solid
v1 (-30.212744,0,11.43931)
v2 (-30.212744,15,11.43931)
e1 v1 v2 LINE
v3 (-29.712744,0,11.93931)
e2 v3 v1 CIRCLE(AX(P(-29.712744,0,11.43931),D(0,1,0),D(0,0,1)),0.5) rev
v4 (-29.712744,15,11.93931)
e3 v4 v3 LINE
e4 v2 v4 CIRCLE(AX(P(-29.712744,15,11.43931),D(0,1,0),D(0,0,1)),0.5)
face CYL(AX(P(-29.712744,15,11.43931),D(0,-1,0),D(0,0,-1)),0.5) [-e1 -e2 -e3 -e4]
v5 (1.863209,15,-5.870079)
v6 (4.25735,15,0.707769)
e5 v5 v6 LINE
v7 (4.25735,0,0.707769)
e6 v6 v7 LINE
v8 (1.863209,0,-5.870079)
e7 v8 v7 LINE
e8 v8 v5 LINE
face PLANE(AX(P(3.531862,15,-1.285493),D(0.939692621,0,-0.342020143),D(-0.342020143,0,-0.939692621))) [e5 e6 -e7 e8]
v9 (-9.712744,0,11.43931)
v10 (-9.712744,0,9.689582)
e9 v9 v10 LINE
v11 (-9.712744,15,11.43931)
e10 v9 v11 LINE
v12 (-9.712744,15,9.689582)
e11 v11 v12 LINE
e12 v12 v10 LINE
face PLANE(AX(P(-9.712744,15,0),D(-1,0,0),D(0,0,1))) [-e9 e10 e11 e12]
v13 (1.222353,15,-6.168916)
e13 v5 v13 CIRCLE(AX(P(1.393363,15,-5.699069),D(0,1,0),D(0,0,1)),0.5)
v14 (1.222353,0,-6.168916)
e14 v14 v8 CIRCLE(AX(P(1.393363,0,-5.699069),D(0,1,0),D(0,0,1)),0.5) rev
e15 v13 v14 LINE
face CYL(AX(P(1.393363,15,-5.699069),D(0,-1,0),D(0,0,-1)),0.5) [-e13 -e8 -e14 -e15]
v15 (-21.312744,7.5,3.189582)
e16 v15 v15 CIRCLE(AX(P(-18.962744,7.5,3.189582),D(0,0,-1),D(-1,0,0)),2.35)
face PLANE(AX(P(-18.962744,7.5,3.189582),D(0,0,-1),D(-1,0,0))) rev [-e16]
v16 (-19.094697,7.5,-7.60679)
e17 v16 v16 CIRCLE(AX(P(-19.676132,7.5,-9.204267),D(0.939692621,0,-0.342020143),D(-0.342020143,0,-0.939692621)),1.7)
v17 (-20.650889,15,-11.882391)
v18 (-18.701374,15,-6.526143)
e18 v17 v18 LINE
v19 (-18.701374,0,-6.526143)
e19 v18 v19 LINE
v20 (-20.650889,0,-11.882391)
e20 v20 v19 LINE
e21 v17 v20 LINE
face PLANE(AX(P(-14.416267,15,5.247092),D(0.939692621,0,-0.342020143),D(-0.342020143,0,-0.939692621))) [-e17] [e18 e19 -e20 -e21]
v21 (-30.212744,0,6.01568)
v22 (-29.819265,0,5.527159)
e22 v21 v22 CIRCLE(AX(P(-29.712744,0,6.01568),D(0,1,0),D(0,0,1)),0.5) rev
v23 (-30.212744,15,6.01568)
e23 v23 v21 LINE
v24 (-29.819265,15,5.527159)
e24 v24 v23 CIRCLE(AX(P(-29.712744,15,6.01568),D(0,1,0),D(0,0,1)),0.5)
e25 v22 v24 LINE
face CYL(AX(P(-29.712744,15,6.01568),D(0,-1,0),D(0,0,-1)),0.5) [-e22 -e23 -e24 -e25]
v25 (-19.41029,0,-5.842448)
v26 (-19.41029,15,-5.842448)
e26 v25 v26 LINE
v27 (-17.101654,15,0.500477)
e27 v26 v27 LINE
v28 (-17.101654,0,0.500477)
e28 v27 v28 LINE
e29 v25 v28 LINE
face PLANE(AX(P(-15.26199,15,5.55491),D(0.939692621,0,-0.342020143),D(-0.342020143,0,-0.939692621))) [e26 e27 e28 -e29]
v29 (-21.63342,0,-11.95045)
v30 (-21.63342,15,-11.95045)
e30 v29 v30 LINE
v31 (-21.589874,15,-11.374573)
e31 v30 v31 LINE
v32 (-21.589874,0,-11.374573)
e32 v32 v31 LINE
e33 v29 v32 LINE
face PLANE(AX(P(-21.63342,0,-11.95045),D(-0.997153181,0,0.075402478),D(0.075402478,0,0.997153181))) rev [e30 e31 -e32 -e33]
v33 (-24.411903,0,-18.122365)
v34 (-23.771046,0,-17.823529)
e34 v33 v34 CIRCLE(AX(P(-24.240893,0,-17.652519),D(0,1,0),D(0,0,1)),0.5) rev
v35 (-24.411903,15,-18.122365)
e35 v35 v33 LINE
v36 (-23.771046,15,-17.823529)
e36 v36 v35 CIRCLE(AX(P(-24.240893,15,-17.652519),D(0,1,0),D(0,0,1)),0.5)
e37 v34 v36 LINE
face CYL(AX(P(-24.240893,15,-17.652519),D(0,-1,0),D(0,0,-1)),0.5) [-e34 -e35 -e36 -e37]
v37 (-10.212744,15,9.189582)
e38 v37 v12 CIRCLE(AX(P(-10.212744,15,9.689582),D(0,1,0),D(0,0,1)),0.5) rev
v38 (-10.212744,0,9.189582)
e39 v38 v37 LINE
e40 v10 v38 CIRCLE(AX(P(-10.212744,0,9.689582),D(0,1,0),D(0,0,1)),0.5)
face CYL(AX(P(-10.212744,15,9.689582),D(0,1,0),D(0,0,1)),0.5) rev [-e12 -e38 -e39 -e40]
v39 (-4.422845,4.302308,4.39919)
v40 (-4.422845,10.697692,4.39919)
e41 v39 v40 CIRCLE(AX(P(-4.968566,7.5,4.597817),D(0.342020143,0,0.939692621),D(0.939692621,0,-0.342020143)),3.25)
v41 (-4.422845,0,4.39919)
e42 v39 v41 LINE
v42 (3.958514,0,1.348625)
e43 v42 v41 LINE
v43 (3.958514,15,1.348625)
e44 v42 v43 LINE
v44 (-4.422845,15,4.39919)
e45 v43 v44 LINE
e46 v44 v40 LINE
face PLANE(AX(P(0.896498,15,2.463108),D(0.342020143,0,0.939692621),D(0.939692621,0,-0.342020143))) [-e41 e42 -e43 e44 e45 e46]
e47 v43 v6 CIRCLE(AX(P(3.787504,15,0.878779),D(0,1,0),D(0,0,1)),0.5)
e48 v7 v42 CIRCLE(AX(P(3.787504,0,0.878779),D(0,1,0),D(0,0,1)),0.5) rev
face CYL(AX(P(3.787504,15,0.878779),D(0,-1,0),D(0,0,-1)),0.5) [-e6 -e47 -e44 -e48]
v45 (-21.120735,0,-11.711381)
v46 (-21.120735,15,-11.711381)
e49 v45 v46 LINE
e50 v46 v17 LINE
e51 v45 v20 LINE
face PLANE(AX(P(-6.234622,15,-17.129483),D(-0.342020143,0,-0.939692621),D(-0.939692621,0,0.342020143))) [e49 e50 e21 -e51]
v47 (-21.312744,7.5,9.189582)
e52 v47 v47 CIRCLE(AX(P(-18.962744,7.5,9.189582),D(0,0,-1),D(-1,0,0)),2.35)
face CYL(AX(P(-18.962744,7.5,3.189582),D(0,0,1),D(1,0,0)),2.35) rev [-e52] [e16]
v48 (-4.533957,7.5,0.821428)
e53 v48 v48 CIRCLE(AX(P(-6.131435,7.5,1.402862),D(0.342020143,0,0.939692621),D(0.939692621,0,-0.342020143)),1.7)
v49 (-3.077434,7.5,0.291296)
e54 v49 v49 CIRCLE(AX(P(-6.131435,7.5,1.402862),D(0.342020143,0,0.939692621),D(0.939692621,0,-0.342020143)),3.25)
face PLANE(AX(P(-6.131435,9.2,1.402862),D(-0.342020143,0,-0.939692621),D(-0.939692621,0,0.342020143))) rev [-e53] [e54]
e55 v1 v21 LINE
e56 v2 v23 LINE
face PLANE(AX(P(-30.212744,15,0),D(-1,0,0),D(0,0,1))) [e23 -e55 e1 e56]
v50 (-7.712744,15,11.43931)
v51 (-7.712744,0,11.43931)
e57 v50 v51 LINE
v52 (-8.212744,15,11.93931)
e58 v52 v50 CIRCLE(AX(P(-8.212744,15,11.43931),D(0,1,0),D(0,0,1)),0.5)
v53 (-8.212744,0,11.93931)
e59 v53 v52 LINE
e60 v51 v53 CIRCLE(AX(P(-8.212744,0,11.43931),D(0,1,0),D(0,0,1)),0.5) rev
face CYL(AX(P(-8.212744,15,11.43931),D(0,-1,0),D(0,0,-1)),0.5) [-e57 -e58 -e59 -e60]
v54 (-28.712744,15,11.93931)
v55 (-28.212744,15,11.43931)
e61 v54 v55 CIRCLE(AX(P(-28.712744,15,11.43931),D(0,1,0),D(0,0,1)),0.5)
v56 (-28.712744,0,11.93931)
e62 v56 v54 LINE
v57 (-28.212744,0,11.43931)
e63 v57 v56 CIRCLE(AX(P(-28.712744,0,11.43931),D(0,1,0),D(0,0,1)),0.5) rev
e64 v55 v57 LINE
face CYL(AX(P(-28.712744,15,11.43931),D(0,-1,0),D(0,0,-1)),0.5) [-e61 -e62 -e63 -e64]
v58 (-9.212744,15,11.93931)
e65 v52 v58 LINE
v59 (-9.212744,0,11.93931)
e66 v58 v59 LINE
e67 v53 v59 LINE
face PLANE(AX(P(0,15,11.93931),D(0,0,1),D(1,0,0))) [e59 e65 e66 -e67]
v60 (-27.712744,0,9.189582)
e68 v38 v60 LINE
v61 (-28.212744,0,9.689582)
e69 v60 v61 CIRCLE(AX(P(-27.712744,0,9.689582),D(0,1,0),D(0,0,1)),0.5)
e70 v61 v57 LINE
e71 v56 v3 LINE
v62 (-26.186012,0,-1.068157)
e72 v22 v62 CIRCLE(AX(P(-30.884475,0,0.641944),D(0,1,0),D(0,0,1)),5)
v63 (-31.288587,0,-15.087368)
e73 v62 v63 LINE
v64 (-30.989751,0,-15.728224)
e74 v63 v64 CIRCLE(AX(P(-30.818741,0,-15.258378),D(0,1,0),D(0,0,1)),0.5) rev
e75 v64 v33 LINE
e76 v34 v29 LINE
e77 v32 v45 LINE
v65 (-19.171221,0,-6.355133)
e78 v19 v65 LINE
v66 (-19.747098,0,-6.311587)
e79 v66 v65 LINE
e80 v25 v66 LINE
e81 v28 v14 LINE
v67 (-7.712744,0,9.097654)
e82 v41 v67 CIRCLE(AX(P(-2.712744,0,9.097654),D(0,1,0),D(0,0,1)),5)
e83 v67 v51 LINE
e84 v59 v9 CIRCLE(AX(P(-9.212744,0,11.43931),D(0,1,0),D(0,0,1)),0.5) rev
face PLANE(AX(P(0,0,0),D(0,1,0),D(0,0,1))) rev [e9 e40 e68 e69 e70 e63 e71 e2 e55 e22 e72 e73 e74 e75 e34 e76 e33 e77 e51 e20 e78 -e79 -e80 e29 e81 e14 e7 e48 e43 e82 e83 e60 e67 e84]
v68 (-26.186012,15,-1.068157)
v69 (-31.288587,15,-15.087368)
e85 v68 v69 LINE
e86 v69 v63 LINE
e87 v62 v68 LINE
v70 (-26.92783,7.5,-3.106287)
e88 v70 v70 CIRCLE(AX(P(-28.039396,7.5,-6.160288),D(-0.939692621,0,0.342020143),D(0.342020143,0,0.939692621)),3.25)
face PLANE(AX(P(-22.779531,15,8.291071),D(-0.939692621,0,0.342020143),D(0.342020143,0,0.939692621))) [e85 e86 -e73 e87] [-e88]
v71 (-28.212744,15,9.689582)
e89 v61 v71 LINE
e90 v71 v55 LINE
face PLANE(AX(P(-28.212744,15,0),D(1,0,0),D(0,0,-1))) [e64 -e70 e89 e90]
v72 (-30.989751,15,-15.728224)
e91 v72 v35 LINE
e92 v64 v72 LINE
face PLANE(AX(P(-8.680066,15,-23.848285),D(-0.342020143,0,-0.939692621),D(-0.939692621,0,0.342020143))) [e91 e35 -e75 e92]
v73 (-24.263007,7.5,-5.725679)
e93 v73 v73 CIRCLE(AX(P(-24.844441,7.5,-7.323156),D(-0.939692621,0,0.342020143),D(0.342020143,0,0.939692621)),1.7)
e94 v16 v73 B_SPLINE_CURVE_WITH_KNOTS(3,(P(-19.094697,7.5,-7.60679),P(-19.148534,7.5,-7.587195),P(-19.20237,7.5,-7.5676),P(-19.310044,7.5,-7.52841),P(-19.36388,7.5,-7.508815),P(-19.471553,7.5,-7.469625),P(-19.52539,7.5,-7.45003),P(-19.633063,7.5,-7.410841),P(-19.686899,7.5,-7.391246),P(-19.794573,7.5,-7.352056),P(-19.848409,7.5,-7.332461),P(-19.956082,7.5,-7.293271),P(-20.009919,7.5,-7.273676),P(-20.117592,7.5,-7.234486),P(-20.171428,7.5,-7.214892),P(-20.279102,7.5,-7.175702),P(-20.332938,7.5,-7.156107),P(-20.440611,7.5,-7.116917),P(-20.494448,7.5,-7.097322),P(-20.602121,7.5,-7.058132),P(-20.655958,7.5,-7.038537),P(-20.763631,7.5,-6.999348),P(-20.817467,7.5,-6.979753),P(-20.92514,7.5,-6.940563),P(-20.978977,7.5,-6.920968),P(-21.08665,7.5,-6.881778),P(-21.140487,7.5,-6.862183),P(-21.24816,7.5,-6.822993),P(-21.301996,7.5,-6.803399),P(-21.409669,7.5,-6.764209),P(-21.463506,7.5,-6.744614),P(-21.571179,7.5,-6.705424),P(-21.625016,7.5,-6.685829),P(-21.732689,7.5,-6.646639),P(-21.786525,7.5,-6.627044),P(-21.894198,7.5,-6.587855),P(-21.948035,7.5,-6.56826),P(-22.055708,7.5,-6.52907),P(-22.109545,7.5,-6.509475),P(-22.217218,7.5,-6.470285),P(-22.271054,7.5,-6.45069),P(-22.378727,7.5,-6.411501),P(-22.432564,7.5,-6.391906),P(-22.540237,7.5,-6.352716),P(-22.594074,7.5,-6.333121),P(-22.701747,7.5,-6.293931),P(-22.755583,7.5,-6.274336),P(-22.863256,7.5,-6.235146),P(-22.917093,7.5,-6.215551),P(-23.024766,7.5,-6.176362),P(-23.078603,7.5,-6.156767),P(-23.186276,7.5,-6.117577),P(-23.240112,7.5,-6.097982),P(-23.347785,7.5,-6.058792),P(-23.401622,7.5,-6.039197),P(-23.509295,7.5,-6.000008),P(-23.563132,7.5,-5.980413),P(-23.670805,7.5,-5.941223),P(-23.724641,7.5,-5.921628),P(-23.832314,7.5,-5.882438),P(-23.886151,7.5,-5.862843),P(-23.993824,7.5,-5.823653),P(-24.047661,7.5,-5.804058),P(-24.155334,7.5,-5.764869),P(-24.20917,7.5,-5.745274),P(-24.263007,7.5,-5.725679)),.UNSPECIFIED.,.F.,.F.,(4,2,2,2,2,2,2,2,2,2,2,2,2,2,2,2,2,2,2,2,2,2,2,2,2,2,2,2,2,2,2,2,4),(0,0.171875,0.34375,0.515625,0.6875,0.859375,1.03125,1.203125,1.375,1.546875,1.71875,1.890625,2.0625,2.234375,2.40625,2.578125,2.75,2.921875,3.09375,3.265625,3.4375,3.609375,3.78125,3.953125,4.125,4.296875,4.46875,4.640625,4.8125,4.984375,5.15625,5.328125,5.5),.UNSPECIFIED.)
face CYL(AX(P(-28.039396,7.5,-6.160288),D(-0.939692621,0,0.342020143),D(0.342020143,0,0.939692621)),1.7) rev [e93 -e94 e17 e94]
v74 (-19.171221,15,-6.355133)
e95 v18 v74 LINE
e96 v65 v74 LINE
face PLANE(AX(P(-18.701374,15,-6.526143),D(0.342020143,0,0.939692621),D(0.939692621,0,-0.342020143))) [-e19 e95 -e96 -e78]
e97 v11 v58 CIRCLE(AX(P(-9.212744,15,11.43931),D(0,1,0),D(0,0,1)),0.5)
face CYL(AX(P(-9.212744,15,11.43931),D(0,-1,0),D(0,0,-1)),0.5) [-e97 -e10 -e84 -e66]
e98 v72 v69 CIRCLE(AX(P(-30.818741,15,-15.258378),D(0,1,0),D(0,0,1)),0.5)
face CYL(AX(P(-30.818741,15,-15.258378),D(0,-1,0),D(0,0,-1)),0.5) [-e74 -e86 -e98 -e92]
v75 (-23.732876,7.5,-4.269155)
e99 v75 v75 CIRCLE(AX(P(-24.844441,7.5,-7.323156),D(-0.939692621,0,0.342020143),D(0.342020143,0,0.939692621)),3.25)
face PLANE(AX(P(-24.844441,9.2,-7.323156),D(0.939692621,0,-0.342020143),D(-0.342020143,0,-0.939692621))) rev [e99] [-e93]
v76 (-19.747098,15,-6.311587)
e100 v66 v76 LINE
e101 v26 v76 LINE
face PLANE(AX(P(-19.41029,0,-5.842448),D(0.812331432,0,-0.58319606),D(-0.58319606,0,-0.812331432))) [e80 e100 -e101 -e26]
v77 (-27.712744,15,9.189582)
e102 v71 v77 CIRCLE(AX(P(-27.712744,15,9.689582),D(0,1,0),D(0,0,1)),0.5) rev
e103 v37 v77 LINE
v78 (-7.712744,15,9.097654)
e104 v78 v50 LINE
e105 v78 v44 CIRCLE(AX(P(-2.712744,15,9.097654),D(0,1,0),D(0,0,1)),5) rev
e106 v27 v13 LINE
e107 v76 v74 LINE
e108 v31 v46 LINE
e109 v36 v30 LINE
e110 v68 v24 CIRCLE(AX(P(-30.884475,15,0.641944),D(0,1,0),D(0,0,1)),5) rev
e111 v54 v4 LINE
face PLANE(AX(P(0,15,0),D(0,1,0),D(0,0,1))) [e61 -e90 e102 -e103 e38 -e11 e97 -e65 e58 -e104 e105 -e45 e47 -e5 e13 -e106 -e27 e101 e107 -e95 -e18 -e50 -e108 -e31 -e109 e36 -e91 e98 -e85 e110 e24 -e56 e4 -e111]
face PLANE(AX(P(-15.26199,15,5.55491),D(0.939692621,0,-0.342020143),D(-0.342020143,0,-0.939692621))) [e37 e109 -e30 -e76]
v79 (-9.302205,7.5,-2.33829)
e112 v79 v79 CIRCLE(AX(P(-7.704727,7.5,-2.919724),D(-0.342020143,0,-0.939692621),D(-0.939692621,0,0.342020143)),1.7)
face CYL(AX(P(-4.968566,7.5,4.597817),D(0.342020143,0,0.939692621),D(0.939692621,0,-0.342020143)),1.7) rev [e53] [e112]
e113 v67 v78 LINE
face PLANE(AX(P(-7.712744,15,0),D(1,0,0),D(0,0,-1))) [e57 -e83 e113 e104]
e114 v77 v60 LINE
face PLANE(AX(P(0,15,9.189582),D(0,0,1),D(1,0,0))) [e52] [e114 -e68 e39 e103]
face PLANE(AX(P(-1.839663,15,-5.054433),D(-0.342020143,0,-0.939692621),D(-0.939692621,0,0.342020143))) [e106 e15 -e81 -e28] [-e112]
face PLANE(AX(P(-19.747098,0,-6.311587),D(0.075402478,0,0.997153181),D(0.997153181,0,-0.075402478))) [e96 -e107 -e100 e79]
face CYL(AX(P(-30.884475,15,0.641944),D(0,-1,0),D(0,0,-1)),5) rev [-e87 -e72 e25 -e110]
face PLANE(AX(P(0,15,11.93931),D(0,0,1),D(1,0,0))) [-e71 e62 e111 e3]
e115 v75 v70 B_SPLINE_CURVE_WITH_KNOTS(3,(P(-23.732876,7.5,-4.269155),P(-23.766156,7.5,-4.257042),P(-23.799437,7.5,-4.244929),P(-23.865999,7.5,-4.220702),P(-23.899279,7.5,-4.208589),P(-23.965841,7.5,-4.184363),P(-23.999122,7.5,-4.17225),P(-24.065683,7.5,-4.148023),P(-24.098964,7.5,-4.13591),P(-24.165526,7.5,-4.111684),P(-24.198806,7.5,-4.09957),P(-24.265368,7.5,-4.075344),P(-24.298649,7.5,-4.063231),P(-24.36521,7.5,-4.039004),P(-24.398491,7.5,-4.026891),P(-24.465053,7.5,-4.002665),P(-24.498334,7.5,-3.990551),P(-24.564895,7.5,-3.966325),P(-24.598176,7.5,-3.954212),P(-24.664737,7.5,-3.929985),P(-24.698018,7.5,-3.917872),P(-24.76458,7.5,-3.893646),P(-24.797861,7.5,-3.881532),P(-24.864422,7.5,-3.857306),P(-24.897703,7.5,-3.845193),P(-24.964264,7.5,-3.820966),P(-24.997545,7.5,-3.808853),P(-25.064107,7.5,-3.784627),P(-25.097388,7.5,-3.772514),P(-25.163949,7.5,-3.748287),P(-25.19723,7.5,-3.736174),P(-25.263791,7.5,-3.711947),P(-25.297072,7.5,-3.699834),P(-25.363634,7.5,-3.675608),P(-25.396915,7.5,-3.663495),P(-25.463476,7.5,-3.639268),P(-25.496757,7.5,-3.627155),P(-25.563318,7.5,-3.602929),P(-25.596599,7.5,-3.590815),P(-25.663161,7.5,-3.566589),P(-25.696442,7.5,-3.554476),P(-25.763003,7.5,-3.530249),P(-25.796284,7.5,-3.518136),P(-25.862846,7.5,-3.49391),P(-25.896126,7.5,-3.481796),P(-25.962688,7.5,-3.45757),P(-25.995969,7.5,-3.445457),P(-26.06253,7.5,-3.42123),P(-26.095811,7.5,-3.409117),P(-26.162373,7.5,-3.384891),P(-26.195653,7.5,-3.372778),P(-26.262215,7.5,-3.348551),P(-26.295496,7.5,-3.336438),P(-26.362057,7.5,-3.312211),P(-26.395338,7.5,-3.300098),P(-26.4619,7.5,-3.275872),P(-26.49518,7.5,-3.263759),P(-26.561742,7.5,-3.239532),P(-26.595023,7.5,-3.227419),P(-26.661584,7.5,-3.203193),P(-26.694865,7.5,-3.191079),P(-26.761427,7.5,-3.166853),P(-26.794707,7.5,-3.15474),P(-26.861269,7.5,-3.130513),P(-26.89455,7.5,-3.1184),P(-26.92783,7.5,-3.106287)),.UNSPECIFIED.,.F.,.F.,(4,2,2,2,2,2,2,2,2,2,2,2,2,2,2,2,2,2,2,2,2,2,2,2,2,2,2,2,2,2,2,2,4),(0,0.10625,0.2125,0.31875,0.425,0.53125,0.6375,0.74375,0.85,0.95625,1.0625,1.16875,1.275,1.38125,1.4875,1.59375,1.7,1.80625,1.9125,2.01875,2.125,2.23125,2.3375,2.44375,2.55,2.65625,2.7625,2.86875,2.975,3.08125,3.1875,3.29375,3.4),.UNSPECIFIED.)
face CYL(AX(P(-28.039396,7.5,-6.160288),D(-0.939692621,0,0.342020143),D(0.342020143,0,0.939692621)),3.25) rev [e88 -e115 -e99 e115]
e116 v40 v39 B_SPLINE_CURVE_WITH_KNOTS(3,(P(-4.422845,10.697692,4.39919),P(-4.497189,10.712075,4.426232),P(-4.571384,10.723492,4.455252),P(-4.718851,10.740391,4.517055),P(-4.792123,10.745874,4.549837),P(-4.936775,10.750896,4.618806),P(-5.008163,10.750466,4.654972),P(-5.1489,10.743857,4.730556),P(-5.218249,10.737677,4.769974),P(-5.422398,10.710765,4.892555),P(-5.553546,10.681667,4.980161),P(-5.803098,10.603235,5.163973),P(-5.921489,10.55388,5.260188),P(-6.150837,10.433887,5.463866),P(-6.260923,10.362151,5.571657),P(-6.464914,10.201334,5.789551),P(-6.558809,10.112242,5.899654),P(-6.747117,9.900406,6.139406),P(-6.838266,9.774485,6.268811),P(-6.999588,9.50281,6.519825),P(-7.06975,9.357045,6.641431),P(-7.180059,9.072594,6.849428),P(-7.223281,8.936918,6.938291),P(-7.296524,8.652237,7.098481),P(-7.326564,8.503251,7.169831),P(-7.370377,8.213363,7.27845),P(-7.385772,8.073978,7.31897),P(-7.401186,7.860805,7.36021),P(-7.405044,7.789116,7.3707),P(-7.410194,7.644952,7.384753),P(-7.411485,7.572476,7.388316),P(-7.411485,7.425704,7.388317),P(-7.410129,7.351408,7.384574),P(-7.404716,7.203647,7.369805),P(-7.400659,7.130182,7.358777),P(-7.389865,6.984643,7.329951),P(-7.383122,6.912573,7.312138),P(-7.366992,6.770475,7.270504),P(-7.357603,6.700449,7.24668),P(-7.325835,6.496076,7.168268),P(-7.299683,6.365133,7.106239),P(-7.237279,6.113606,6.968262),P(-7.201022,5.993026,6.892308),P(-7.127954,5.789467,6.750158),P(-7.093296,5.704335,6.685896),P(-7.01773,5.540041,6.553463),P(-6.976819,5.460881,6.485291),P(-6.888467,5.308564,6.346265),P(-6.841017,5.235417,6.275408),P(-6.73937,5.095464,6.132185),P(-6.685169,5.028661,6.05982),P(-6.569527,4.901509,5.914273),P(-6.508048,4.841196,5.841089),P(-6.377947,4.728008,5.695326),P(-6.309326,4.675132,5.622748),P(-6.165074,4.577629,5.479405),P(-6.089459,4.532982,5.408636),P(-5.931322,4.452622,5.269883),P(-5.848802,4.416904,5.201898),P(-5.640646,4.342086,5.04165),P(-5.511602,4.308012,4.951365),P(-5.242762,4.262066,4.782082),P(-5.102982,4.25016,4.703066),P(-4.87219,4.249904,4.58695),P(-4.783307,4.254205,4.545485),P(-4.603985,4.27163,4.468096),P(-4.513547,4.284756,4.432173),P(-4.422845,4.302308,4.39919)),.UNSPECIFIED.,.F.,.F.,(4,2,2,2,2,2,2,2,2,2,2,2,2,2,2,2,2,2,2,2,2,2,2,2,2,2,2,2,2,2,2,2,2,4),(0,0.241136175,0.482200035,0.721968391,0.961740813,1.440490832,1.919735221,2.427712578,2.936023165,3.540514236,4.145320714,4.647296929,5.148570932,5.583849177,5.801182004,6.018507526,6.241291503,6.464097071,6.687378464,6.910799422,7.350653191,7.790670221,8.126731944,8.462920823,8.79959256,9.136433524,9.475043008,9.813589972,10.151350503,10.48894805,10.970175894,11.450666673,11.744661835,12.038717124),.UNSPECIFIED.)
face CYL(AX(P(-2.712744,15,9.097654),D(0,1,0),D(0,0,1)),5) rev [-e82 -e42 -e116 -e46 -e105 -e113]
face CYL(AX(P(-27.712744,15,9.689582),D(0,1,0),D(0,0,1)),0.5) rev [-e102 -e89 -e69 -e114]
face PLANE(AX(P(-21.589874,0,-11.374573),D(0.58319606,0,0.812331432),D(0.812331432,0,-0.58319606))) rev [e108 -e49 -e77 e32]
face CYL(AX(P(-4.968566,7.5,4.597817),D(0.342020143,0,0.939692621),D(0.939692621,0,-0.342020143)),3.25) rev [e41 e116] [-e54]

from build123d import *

# Parameters (mm, degrees)
BOSS_EXTRUDE1_DEPTH                                 = 15
SKETCH4_R                                           = 2.35
CUT_EXTRUDE3_DEPTH                                  = 6
CBORE_FOR_M3_HEX_SOCKET_HEAD_CAP_SCREW1_D           = 3.4
CBORE_FOR_M3_HEX_SOCKET_HEAD_CAP_SCREW1_CBORE_D     = 6.5
CBORE_FOR_M3_HEX_SOCKET_HEAD_CAP_SCREW1_CBORE_DEPTH = 3.4
CUT_EXTRUDE4_DEPTH                                  = 40.36183231
SKETCH2_R                                           = 3.25
CUT_EXTRUDE5_DEPTH                                  = 42.264373258
FILLET4_R                                           = 5
FILLET5_R                                           = 5
FILLET6_R                                           = 0.5
FILLET7_R                                           = 0.5
FILLET8_R                                           = 0.5
FILLET9_R                                           = 0.5
FILLET10_R                                          = 0.5
FILLET11_R                                          = 0.5
FILLET12_R                                          = 0.5
FILLET13_R                                          = 0.5
FILLET14_R                                          = 0.5
FILLET15_R                                          = 0.5
FILLET16_R                                          = 0.5


with BuildPart() as part:
    # Sketch1 → Boss-Extrude1 (new body)
    with BuildSketch(Plane(origin=(0, 0, 0), x_dir=(1, 0, 0), z_dir=(0, 1, 0))):
        Polygon((-23.760232958, -5.596615827), (-31.459597373, 15.557214047), (-23.942056406, 18.293375193), (-17.10165354, -0.500477222), (1.692198876, 6.339925644), (4.428360022, -1.177615322), (-7.712744083, -5.596615827), align=None)
        Polygon((-20.650889023, 11.882391084), (-21.496612382, 11.574572955), (-19.547097565, 6.218325016), (-18.701374206, 6.526143145), align=None)
        Polygon((-18.962744083, -5.596615827), (-23.760232958, -5.596615827), (-30.212744083, -5.596615827), (-30.212744083, -11.939309749), (-28.212744083, -11.939309749), (-28.212744083, -9.189582126), (-9.712744083, -9.189582126), (-9.712744083, -11.939309749), (-7.712744083, -11.939309749), (-7.712744083, -5.596615827), align=None)
    extrude(amount=BOSS_EXTRUDE1_DEPTH)

    # Sketch4 → Cut-Extrude3 (cut)
    with BuildSketch(Plane(origin=(0, 0, 9.189582126), x_dir=(-1, 0, 0), z_dir=(0, 0, -1))):
        with Locations((18.962744083, 7.5)):
            Circle(SKETCH4_R)
    extrude(amount=CUT_EXTRUDE3_DEPTH, mode=Mode.SUBTRACT)

    # CBORE for M3 Hex Socket Head Cap Screw1 (through all)
    with Locations(Plane(origin=(-22.779531346, 0, 8.291071361), x_dir=(0.34202014332566366, 0, 0.9396926207859102), z_dir=(-0.9396926207859103, 0, 0.3420201433256637))):
        with Locations((-15.378815242, 7.5)):
            CounterBoreHole(CBORE_FOR_M3_HEX_SOCKET_HEAD_CAP_SCREW1_D / 2, CBORE_FOR_M3_HEX_SOCKET_HEAD_CAP_SCREW1_CBORE_D / 2, CBORE_FOR_M3_HEX_SOCKET_HEAD_CAP_SCREW1_CBORE_DEPTH)

    # Sketch10 → CBORE for M3 Hex Socket Head Cap Screw2 (revolve, cut)
    with BuildSketch(Plane(origin=(-4.968566186, 7.5, 4.597816755), x_dir=(0.9396926207859094, 0, -0.34202014332566627), z_dir=(0, 1, 0))):
        Polygon((0, 0), (0, 30.571150439), (1.7, 30.571150439), (1.7, 3.4), (3.25, 3.4), (3.25, 0), align=None)
    revolve(axis=Axis((-2.796738275, 7.5, 10.564864897), (-0.34202014332566627, 0, -0.9396926207859094)), mode=Mode.SUBTRACT)

    # Sketch11 → Cut-Extrude4 (cut, through all)
    with BuildSketch(Plane(origin=(0, 15, 0), x_dir=(1, 0, 0), z_dir=(0, 1, 0))):
        Polygon((-21.633420439, 11.950450003), (-21.589873913, 11.374572955), (-21.120735333, 11.711381012), (-21.496612382, 11.574572955), align=None)
    cut_extrude4 = extrude(amount=-CUT_EXTRUDE4_DEPTH, mode=Mode.SUBTRACT)

    # Mirror1: Cut-Extrude4 across plane
    add(cut_extrude4.mirror(Plane(origin=(-5.259864593, 0, -14.4513592), x_dir=(0.9396926207859102, 0, -0.3420201433256638), z_dir=(-0.3420201433256638, 0, -0.9396926207859102))), mode=Mode.SUBTRACT)

    # Sketch2 → Cut-Extrude5 (cut, through all)
    with BuildSketch(Plane(origin=(0.896497987, 0, 2.463107975), x_dir=(0.9396926207859094, 0, -0.34202014332566627), z_dir=(0.34202014332566627, 0, 0.9396926207859094))):
        with Locations((-6.241470926, 7.5)):
            Circle(SKETCH2_R)
    extrude(amount=CUT_EXTRUDE5_DEPTH, mode=Mode.SUBTRACT)

    # Fillet4
    # the kernel refuses this fillet: 5 mm, written as the material it adds along each edge
    with BuildSketch(Plane(origin=(-23.760232958, 0, 5.596615827), x_dir=(-0.34202014332566355, 0, -0.9396926207859103), z_dir=(0, 1, 0))) as fillet4_piece_1:
        with BuildLine():
            CenterArc((7.092503292, 5), FILLET4_R, 167.720815182, 102.279184818)
            Line((2.20688878, 6.06337709), (2.10917649, 6.084644632))
            ThreePointArc((2.10917649, 6.084644632), (1.009475128, 3.065890559), (-0.093969262, 0.034202014))
            Line((-0.093969262, 0.034202014), (0, -0.1))
            Line((0, -0.1), (7.092503292, -0.1))
            Line((7.092503292, -0.1), (7.092503292, 0))
        make_face()
    extrude(amount=15)

    # Fillet5
    # the kernel refuses this fillet: 5 mm, written as the material it adds along each edge
    with BuildSketch(Plane(origin=(-7.712744083, 0.173725541, 5.596615827), x_dir=(0, 0, 1), z_dir=(0, 1, 0))) as fillet5_piece_1_section:
        with BuildLine():
            CenterArc((FILLET5_R * 0.70020753821, FILLET5_R), FILLET5_R, 200, 70)
            Line((-FILLET5_R * 0.239485082576, FILLET5_R * 0.657979856674), (0, 0))
            Line((0, 0), (FILLET5_R * 0.70020753821, 0))
        make_face()
    fillet5_piece_1 = extrude(amount=14.826274459, mode=Mode.PRIVATE)
    fillet5_piece_1 = fillet5_piece_1 - Plane(origin=(-4.162007445, 7.5, 6.813818681), x_dir=(0.9396926207859094, 0, -0.34202014332566627), z_dir=(-0.34202014332566627, 0, -0.9396926207859094)) * Cylinder(3.25, 44, mode=Mode.PRIVATE)
    add(fillet5_piece_1)
    with BuildSketch(Plane(origin=(-7.712744083, 0, 5.596615827), x_dir=(0, 0, 1), z_dir=(0, 1, 0))) as fillet5_piece_2_section:
        with BuildLine():
            CenterArc((FILLET5_R * 0.70020753821, FILLET5_R), FILLET5_R, 200, 70)
            Line((-FILLET5_R * 0.239485082576, FILLET5_R * 0.657979856674), (0, 0))
            Line((0, 0), (FILLET5_R * 0.70020753821, 0))
        make_face()
    fillet5_piece_2 = extrude(amount=14.826274459, mode=Mode.PRIVATE)
    fillet5_piece_2 = fillet5_piece_2 - Plane(origin=(-4.162007445, 7.5, 6.813818681), x_dir=(0.9396926207859094, 0, -0.34202014332566627), z_dir=(-0.34202014332566627, 0, -0.9396926207859094)) * Cylinder(3.25, 44, mode=Mode.PRIVATE)
    add(fillet5_piece_2)

    # Fillet6
    fillet6_edges = [part.edges().sort_by_distance(p)[0] for p in [
        (-28.212744083, 7.5, 9.189582126),
    ]]
    fillet(fillet6_edges, radius=FILLET6_R)

    # Fillet7
    fillet7_edges = [part.edges().sort_by_distance(p)[0] for p in [
        (-9.712744083, 7.5, 9.189582126),
    ]]
    fillet(fillet7_edges, radius=FILLET7_R)

    # Fillet8
    fillet8_edges = [part.edges().sort_by_distance(p)[0] for p in [
        (-28.212744083, 7.5, 11.939309749),
    ]]
    fillet(fillet8_edges, radius=FILLET8_R)

    # Fillet9
    fillet9_edges = [part.edges().sort_by_distance(p)[0] for p in [
        (-9.712744083, 7.5, 11.939309749),
    ]]
    fillet(fillet9_edges, radius=FILLET9_R)

    # Fillet10
    fillet10_edges = [part.edges().sort_by_distance(p)[0] for p in [
        (-30.212744083, 7.5, 11.939309749),
    ]]
    fillet(fillet10_edges, radius=FILLET10_R)

    # Fillet11
    fillet11_edges = [part.edges().sort_by_distance(p)[0] for p in [
        (-7.712744083, 7.5, 11.939309749),
    ]]
    fillet(fillet11_edges, radius=FILLET11_R)

    # Fillet12
    fillet12_edges = [part.edges().sort_by_distance(p)[0] for p in [
        (4.428360022, 7.5, 1.177615322),
    ]]
    fillet(fillet12_edges, radius=FILLET12_R)

    # Fillet13
    fillet13_edges = [part.edges().sort_by_distance(p)[0] for p in [
        (1.692198876, 7.5, -6.339925644),
    ]]
    fillet(fillet13_edges, radius=FILLET13_R)

    # Fillet14
    fillet14_edges = [part.edges().sort_by_distance(p)[0] for p in [
        (-23.942056406, 7.5, -18.293375193),
    ]]
    fillet(fillet14_edges, radius=FILLET14_R)

    # Fillet15
    fillet15_edges = [part.edges().sort_by_distance(p)[0] for p in [
        (-31.459597373, 7.5, -15.557214047),
    ]]
    fillet(fillet15_edges, radius=FILLET15_R)

    # Fillet16
    fillet16_edges = [part.edges().sort_by_distance(p)[0] for p in [
        (-30.212744083, 7.5, 5.596615827),
    ]]
    fillet(fillet16_edges, radius=FILLET16_R)


solid = part.part
